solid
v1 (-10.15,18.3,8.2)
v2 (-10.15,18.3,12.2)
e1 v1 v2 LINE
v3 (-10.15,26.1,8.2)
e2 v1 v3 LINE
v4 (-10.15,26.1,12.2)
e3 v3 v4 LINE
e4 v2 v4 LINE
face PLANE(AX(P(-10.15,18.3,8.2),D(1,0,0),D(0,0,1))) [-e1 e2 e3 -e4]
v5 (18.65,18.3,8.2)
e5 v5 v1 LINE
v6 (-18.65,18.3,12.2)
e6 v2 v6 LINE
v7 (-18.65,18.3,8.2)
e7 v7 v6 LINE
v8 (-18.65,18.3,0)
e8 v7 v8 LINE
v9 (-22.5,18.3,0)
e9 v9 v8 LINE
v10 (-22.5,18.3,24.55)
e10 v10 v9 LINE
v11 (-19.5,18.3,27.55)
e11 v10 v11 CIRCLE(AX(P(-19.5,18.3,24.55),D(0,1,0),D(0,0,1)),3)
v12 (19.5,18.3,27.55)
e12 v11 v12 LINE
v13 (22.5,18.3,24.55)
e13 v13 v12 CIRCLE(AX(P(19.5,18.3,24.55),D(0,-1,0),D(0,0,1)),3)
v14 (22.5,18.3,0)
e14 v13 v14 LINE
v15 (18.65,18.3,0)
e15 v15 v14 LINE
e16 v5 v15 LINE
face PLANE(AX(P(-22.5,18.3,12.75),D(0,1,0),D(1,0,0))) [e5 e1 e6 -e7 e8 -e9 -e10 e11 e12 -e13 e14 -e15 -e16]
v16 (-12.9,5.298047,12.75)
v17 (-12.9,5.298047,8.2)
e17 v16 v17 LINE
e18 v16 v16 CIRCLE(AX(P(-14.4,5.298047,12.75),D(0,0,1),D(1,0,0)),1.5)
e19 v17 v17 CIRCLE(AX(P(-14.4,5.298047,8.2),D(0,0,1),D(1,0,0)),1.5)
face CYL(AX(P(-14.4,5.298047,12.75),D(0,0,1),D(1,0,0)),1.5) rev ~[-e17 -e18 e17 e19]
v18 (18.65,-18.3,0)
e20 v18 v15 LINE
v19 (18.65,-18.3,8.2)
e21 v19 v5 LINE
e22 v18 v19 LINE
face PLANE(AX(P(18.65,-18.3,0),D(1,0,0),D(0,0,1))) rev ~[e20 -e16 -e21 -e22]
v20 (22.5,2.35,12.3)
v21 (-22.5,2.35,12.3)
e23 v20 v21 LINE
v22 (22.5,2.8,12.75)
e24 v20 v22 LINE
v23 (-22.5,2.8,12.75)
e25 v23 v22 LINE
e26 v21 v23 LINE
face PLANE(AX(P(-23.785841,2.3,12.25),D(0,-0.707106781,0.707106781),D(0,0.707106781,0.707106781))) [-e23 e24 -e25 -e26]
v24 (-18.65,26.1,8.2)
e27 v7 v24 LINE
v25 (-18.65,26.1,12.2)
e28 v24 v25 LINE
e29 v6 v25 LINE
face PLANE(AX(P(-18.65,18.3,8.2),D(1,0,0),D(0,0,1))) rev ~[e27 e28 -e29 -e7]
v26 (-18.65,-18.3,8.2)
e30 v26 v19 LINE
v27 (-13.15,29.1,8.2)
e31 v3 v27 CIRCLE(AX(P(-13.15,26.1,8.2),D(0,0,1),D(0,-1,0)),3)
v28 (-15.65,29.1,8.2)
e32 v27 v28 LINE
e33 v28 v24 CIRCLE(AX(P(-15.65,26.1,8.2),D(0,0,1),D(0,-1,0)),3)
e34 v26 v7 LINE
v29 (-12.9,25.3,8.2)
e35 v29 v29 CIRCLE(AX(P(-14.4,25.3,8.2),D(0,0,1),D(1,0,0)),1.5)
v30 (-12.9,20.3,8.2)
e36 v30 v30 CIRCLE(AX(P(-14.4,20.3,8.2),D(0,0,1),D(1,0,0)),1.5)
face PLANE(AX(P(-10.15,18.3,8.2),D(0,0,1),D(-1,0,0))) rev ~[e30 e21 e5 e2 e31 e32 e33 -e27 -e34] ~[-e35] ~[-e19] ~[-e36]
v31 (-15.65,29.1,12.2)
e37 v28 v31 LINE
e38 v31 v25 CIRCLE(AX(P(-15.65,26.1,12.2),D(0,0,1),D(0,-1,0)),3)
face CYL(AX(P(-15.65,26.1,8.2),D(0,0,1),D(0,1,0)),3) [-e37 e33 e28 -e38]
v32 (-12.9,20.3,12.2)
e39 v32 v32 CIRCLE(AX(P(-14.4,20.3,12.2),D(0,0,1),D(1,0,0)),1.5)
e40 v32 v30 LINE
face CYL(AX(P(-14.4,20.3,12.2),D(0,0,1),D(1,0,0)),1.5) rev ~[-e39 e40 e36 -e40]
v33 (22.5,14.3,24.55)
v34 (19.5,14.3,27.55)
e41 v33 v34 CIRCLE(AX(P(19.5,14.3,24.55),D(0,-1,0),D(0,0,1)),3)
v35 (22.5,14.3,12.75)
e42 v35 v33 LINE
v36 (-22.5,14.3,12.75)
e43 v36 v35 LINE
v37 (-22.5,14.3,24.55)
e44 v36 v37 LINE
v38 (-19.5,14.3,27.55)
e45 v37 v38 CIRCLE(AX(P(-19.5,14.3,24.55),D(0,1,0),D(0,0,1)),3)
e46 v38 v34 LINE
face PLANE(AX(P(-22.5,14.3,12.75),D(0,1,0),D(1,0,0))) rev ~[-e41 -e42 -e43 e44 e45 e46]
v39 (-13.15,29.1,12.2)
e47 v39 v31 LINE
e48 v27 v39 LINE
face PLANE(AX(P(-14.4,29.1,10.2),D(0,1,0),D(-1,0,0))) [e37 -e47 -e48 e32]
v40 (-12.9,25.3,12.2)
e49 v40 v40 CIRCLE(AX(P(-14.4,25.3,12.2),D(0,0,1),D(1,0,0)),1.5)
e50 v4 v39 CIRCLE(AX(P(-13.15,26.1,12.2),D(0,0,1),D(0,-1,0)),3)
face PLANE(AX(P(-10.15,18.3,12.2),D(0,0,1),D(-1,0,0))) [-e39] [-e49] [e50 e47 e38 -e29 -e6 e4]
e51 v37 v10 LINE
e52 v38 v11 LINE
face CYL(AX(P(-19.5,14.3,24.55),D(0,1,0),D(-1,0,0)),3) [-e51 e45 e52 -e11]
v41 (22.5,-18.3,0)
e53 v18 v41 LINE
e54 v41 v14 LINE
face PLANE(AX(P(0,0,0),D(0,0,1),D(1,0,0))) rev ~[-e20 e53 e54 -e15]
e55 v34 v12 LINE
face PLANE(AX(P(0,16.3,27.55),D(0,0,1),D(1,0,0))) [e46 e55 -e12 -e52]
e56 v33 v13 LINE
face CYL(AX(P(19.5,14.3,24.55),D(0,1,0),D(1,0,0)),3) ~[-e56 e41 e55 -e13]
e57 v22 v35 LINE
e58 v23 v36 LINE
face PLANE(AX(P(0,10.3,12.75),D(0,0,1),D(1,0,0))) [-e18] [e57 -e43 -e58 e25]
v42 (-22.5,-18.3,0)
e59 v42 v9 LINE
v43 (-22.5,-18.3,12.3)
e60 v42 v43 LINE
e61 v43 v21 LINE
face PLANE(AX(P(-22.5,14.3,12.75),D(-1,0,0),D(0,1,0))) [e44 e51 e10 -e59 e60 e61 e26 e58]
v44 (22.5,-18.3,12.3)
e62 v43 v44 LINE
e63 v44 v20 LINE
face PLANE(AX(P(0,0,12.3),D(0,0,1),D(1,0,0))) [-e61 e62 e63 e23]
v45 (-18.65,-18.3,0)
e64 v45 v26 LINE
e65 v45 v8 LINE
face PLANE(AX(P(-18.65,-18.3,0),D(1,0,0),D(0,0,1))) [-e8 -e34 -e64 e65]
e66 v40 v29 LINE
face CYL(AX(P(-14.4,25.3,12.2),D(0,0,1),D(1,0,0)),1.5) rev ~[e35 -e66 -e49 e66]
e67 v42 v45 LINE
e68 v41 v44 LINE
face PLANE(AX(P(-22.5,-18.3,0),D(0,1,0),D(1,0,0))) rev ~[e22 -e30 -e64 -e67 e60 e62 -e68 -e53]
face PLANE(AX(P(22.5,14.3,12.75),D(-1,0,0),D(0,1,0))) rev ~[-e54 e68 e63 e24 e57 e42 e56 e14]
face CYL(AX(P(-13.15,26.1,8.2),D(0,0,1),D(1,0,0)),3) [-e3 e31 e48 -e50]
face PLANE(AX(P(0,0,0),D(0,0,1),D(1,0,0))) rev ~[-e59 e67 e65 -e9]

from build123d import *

# Parameters (mm, degrees)
F0_W        = 45
F0_H        = 36.6
F1_DEPTH    = 12.3
F2_W        = 37.3
F2_H        = 8.2
F3_DEPTH    = 36.601
F4_W        = 45
F4_H        = 16
F5_DEPTH    = 0.45
F6_T4_DEPTH = 47.571682988
F7_W        = 45
F7_H        = 4
F8_DEPTH    = 14.8
F9_R        = 3
F10_W       = 8.5
F10_H       = 4
F11_DEPTH   = 10.8
F12_R       = 3
F13_R       = 1.5
F14_DEPTH   = 25
F15_R       = 1.5
F16_DEPTH   = 25


# Not quite as in the source:
# - a fillet or chamfer that OpenCascade refuses, or shapes differently, is made with other operations: its cross-section is extruded or revolved along the edge and cut away or added


with BuildPart() as f1:
    # F0 (on Top) → F1 (new body)
    with BuildSketch(Plane.XY):
        Rectangle(F0_W, F0_H)
    extrude(amount=F1_DEPTH)

    # F2 (on face) → F3 (cut, through all)
    with BuildSketch(Plane.XZ.offset(18.3)):
        with Locations((0, 4.1)):
            Rectangle(F2_W, F2_H)
    extrude(amount=-F3_DEPTH, mode=Mode.SUBTRACT)

    # F4 (on face) → F5 (join)
    with BuildSketch(Plane.XY.offset(12.3)):
        with Locations((0, 10.3)):
            Rectangle(F4_W, F4_H)
    extrude(amount=F5_DEPTH)

    # F6: chamfer of 0.5 on 1 edges, made by hand


with BuildPart() as f6_tool2:
    # F6_s3 → F6_t4 (new body)
    with BuildSketch(Plane.YZ.offset(-23.785841494)):
        Polygon((2.3, 12.25), (2.8, 12.75), (2.3, 12.75), align=None)
    extrude(amount=F6_T4_DEPTH)

    split(bisect_by=Plane.XY.offset(12.3), keep=Keep.TOP)


with BuildPart() as f1_1:
    add(f1.part)

    # F6_t1: cut F6_tool2
    add(f6_tool2.part, mode=Mode.SUBTRACT)

    # F7 (on face) → F8 (join)
    with BuildSketch(Plane.XY.offset(12.75)):
        with Locations((0, 16.3)):
            Rectangle(F7_W, F7_H)
    extrude(amount=F8_DEPTH)

    # F9
    f9_edges = [f1_1.edges().sort_by_distance(p)[0] for p in [
        (-22.5, 16.3, 27.55),
        (22.5, 16.3, 27.55),
    ]]
    fillet(f9_edges, radius=F9_R)

    # F10 (on face) → F11 (join)
    with BuildSketch(Plane(origin=(0, 18.3, 0), x_dir=(-1, 0, 0), z_dir=(0, 1, 0))):
        with Locations((14.4, 10.2)):
            Rectangle(F10_W, F10_H)
    extrude(amount=F11_DEPTH)

    # F12
    f12_edges = [f1_1.edges().sort_by_distance(p)[0] for p in [
        (-10.15, 29.1, 10.2),
        (-18.65, 29.1, 10.2),
    ]]
    fillet(f12_edges, radius=F12_R)

    # F13 (on face) → F14 (cut)
    with BuildSketch(Plane.XY.offset(12.2)):
        with Locations((-14.4, 25.3)):
            Circle(F13_R)
        with Locations((-14.4, 20.3)):
            Circle(F13_R)
    extrude(amount=-F14_DEPTH, mode=Mode.SUBTRACT)

    # F15 (on face) → F16 (cut)
    with BuildSketch(Plane.XY.offset(12.75)):
        with Locations((-14.4, 5.2980469912)):
            Circle(F15_R)
    extrude(amount=-F16_DEPTH, mode=Mode.SUBTRACT)


solid = f1_1.part
